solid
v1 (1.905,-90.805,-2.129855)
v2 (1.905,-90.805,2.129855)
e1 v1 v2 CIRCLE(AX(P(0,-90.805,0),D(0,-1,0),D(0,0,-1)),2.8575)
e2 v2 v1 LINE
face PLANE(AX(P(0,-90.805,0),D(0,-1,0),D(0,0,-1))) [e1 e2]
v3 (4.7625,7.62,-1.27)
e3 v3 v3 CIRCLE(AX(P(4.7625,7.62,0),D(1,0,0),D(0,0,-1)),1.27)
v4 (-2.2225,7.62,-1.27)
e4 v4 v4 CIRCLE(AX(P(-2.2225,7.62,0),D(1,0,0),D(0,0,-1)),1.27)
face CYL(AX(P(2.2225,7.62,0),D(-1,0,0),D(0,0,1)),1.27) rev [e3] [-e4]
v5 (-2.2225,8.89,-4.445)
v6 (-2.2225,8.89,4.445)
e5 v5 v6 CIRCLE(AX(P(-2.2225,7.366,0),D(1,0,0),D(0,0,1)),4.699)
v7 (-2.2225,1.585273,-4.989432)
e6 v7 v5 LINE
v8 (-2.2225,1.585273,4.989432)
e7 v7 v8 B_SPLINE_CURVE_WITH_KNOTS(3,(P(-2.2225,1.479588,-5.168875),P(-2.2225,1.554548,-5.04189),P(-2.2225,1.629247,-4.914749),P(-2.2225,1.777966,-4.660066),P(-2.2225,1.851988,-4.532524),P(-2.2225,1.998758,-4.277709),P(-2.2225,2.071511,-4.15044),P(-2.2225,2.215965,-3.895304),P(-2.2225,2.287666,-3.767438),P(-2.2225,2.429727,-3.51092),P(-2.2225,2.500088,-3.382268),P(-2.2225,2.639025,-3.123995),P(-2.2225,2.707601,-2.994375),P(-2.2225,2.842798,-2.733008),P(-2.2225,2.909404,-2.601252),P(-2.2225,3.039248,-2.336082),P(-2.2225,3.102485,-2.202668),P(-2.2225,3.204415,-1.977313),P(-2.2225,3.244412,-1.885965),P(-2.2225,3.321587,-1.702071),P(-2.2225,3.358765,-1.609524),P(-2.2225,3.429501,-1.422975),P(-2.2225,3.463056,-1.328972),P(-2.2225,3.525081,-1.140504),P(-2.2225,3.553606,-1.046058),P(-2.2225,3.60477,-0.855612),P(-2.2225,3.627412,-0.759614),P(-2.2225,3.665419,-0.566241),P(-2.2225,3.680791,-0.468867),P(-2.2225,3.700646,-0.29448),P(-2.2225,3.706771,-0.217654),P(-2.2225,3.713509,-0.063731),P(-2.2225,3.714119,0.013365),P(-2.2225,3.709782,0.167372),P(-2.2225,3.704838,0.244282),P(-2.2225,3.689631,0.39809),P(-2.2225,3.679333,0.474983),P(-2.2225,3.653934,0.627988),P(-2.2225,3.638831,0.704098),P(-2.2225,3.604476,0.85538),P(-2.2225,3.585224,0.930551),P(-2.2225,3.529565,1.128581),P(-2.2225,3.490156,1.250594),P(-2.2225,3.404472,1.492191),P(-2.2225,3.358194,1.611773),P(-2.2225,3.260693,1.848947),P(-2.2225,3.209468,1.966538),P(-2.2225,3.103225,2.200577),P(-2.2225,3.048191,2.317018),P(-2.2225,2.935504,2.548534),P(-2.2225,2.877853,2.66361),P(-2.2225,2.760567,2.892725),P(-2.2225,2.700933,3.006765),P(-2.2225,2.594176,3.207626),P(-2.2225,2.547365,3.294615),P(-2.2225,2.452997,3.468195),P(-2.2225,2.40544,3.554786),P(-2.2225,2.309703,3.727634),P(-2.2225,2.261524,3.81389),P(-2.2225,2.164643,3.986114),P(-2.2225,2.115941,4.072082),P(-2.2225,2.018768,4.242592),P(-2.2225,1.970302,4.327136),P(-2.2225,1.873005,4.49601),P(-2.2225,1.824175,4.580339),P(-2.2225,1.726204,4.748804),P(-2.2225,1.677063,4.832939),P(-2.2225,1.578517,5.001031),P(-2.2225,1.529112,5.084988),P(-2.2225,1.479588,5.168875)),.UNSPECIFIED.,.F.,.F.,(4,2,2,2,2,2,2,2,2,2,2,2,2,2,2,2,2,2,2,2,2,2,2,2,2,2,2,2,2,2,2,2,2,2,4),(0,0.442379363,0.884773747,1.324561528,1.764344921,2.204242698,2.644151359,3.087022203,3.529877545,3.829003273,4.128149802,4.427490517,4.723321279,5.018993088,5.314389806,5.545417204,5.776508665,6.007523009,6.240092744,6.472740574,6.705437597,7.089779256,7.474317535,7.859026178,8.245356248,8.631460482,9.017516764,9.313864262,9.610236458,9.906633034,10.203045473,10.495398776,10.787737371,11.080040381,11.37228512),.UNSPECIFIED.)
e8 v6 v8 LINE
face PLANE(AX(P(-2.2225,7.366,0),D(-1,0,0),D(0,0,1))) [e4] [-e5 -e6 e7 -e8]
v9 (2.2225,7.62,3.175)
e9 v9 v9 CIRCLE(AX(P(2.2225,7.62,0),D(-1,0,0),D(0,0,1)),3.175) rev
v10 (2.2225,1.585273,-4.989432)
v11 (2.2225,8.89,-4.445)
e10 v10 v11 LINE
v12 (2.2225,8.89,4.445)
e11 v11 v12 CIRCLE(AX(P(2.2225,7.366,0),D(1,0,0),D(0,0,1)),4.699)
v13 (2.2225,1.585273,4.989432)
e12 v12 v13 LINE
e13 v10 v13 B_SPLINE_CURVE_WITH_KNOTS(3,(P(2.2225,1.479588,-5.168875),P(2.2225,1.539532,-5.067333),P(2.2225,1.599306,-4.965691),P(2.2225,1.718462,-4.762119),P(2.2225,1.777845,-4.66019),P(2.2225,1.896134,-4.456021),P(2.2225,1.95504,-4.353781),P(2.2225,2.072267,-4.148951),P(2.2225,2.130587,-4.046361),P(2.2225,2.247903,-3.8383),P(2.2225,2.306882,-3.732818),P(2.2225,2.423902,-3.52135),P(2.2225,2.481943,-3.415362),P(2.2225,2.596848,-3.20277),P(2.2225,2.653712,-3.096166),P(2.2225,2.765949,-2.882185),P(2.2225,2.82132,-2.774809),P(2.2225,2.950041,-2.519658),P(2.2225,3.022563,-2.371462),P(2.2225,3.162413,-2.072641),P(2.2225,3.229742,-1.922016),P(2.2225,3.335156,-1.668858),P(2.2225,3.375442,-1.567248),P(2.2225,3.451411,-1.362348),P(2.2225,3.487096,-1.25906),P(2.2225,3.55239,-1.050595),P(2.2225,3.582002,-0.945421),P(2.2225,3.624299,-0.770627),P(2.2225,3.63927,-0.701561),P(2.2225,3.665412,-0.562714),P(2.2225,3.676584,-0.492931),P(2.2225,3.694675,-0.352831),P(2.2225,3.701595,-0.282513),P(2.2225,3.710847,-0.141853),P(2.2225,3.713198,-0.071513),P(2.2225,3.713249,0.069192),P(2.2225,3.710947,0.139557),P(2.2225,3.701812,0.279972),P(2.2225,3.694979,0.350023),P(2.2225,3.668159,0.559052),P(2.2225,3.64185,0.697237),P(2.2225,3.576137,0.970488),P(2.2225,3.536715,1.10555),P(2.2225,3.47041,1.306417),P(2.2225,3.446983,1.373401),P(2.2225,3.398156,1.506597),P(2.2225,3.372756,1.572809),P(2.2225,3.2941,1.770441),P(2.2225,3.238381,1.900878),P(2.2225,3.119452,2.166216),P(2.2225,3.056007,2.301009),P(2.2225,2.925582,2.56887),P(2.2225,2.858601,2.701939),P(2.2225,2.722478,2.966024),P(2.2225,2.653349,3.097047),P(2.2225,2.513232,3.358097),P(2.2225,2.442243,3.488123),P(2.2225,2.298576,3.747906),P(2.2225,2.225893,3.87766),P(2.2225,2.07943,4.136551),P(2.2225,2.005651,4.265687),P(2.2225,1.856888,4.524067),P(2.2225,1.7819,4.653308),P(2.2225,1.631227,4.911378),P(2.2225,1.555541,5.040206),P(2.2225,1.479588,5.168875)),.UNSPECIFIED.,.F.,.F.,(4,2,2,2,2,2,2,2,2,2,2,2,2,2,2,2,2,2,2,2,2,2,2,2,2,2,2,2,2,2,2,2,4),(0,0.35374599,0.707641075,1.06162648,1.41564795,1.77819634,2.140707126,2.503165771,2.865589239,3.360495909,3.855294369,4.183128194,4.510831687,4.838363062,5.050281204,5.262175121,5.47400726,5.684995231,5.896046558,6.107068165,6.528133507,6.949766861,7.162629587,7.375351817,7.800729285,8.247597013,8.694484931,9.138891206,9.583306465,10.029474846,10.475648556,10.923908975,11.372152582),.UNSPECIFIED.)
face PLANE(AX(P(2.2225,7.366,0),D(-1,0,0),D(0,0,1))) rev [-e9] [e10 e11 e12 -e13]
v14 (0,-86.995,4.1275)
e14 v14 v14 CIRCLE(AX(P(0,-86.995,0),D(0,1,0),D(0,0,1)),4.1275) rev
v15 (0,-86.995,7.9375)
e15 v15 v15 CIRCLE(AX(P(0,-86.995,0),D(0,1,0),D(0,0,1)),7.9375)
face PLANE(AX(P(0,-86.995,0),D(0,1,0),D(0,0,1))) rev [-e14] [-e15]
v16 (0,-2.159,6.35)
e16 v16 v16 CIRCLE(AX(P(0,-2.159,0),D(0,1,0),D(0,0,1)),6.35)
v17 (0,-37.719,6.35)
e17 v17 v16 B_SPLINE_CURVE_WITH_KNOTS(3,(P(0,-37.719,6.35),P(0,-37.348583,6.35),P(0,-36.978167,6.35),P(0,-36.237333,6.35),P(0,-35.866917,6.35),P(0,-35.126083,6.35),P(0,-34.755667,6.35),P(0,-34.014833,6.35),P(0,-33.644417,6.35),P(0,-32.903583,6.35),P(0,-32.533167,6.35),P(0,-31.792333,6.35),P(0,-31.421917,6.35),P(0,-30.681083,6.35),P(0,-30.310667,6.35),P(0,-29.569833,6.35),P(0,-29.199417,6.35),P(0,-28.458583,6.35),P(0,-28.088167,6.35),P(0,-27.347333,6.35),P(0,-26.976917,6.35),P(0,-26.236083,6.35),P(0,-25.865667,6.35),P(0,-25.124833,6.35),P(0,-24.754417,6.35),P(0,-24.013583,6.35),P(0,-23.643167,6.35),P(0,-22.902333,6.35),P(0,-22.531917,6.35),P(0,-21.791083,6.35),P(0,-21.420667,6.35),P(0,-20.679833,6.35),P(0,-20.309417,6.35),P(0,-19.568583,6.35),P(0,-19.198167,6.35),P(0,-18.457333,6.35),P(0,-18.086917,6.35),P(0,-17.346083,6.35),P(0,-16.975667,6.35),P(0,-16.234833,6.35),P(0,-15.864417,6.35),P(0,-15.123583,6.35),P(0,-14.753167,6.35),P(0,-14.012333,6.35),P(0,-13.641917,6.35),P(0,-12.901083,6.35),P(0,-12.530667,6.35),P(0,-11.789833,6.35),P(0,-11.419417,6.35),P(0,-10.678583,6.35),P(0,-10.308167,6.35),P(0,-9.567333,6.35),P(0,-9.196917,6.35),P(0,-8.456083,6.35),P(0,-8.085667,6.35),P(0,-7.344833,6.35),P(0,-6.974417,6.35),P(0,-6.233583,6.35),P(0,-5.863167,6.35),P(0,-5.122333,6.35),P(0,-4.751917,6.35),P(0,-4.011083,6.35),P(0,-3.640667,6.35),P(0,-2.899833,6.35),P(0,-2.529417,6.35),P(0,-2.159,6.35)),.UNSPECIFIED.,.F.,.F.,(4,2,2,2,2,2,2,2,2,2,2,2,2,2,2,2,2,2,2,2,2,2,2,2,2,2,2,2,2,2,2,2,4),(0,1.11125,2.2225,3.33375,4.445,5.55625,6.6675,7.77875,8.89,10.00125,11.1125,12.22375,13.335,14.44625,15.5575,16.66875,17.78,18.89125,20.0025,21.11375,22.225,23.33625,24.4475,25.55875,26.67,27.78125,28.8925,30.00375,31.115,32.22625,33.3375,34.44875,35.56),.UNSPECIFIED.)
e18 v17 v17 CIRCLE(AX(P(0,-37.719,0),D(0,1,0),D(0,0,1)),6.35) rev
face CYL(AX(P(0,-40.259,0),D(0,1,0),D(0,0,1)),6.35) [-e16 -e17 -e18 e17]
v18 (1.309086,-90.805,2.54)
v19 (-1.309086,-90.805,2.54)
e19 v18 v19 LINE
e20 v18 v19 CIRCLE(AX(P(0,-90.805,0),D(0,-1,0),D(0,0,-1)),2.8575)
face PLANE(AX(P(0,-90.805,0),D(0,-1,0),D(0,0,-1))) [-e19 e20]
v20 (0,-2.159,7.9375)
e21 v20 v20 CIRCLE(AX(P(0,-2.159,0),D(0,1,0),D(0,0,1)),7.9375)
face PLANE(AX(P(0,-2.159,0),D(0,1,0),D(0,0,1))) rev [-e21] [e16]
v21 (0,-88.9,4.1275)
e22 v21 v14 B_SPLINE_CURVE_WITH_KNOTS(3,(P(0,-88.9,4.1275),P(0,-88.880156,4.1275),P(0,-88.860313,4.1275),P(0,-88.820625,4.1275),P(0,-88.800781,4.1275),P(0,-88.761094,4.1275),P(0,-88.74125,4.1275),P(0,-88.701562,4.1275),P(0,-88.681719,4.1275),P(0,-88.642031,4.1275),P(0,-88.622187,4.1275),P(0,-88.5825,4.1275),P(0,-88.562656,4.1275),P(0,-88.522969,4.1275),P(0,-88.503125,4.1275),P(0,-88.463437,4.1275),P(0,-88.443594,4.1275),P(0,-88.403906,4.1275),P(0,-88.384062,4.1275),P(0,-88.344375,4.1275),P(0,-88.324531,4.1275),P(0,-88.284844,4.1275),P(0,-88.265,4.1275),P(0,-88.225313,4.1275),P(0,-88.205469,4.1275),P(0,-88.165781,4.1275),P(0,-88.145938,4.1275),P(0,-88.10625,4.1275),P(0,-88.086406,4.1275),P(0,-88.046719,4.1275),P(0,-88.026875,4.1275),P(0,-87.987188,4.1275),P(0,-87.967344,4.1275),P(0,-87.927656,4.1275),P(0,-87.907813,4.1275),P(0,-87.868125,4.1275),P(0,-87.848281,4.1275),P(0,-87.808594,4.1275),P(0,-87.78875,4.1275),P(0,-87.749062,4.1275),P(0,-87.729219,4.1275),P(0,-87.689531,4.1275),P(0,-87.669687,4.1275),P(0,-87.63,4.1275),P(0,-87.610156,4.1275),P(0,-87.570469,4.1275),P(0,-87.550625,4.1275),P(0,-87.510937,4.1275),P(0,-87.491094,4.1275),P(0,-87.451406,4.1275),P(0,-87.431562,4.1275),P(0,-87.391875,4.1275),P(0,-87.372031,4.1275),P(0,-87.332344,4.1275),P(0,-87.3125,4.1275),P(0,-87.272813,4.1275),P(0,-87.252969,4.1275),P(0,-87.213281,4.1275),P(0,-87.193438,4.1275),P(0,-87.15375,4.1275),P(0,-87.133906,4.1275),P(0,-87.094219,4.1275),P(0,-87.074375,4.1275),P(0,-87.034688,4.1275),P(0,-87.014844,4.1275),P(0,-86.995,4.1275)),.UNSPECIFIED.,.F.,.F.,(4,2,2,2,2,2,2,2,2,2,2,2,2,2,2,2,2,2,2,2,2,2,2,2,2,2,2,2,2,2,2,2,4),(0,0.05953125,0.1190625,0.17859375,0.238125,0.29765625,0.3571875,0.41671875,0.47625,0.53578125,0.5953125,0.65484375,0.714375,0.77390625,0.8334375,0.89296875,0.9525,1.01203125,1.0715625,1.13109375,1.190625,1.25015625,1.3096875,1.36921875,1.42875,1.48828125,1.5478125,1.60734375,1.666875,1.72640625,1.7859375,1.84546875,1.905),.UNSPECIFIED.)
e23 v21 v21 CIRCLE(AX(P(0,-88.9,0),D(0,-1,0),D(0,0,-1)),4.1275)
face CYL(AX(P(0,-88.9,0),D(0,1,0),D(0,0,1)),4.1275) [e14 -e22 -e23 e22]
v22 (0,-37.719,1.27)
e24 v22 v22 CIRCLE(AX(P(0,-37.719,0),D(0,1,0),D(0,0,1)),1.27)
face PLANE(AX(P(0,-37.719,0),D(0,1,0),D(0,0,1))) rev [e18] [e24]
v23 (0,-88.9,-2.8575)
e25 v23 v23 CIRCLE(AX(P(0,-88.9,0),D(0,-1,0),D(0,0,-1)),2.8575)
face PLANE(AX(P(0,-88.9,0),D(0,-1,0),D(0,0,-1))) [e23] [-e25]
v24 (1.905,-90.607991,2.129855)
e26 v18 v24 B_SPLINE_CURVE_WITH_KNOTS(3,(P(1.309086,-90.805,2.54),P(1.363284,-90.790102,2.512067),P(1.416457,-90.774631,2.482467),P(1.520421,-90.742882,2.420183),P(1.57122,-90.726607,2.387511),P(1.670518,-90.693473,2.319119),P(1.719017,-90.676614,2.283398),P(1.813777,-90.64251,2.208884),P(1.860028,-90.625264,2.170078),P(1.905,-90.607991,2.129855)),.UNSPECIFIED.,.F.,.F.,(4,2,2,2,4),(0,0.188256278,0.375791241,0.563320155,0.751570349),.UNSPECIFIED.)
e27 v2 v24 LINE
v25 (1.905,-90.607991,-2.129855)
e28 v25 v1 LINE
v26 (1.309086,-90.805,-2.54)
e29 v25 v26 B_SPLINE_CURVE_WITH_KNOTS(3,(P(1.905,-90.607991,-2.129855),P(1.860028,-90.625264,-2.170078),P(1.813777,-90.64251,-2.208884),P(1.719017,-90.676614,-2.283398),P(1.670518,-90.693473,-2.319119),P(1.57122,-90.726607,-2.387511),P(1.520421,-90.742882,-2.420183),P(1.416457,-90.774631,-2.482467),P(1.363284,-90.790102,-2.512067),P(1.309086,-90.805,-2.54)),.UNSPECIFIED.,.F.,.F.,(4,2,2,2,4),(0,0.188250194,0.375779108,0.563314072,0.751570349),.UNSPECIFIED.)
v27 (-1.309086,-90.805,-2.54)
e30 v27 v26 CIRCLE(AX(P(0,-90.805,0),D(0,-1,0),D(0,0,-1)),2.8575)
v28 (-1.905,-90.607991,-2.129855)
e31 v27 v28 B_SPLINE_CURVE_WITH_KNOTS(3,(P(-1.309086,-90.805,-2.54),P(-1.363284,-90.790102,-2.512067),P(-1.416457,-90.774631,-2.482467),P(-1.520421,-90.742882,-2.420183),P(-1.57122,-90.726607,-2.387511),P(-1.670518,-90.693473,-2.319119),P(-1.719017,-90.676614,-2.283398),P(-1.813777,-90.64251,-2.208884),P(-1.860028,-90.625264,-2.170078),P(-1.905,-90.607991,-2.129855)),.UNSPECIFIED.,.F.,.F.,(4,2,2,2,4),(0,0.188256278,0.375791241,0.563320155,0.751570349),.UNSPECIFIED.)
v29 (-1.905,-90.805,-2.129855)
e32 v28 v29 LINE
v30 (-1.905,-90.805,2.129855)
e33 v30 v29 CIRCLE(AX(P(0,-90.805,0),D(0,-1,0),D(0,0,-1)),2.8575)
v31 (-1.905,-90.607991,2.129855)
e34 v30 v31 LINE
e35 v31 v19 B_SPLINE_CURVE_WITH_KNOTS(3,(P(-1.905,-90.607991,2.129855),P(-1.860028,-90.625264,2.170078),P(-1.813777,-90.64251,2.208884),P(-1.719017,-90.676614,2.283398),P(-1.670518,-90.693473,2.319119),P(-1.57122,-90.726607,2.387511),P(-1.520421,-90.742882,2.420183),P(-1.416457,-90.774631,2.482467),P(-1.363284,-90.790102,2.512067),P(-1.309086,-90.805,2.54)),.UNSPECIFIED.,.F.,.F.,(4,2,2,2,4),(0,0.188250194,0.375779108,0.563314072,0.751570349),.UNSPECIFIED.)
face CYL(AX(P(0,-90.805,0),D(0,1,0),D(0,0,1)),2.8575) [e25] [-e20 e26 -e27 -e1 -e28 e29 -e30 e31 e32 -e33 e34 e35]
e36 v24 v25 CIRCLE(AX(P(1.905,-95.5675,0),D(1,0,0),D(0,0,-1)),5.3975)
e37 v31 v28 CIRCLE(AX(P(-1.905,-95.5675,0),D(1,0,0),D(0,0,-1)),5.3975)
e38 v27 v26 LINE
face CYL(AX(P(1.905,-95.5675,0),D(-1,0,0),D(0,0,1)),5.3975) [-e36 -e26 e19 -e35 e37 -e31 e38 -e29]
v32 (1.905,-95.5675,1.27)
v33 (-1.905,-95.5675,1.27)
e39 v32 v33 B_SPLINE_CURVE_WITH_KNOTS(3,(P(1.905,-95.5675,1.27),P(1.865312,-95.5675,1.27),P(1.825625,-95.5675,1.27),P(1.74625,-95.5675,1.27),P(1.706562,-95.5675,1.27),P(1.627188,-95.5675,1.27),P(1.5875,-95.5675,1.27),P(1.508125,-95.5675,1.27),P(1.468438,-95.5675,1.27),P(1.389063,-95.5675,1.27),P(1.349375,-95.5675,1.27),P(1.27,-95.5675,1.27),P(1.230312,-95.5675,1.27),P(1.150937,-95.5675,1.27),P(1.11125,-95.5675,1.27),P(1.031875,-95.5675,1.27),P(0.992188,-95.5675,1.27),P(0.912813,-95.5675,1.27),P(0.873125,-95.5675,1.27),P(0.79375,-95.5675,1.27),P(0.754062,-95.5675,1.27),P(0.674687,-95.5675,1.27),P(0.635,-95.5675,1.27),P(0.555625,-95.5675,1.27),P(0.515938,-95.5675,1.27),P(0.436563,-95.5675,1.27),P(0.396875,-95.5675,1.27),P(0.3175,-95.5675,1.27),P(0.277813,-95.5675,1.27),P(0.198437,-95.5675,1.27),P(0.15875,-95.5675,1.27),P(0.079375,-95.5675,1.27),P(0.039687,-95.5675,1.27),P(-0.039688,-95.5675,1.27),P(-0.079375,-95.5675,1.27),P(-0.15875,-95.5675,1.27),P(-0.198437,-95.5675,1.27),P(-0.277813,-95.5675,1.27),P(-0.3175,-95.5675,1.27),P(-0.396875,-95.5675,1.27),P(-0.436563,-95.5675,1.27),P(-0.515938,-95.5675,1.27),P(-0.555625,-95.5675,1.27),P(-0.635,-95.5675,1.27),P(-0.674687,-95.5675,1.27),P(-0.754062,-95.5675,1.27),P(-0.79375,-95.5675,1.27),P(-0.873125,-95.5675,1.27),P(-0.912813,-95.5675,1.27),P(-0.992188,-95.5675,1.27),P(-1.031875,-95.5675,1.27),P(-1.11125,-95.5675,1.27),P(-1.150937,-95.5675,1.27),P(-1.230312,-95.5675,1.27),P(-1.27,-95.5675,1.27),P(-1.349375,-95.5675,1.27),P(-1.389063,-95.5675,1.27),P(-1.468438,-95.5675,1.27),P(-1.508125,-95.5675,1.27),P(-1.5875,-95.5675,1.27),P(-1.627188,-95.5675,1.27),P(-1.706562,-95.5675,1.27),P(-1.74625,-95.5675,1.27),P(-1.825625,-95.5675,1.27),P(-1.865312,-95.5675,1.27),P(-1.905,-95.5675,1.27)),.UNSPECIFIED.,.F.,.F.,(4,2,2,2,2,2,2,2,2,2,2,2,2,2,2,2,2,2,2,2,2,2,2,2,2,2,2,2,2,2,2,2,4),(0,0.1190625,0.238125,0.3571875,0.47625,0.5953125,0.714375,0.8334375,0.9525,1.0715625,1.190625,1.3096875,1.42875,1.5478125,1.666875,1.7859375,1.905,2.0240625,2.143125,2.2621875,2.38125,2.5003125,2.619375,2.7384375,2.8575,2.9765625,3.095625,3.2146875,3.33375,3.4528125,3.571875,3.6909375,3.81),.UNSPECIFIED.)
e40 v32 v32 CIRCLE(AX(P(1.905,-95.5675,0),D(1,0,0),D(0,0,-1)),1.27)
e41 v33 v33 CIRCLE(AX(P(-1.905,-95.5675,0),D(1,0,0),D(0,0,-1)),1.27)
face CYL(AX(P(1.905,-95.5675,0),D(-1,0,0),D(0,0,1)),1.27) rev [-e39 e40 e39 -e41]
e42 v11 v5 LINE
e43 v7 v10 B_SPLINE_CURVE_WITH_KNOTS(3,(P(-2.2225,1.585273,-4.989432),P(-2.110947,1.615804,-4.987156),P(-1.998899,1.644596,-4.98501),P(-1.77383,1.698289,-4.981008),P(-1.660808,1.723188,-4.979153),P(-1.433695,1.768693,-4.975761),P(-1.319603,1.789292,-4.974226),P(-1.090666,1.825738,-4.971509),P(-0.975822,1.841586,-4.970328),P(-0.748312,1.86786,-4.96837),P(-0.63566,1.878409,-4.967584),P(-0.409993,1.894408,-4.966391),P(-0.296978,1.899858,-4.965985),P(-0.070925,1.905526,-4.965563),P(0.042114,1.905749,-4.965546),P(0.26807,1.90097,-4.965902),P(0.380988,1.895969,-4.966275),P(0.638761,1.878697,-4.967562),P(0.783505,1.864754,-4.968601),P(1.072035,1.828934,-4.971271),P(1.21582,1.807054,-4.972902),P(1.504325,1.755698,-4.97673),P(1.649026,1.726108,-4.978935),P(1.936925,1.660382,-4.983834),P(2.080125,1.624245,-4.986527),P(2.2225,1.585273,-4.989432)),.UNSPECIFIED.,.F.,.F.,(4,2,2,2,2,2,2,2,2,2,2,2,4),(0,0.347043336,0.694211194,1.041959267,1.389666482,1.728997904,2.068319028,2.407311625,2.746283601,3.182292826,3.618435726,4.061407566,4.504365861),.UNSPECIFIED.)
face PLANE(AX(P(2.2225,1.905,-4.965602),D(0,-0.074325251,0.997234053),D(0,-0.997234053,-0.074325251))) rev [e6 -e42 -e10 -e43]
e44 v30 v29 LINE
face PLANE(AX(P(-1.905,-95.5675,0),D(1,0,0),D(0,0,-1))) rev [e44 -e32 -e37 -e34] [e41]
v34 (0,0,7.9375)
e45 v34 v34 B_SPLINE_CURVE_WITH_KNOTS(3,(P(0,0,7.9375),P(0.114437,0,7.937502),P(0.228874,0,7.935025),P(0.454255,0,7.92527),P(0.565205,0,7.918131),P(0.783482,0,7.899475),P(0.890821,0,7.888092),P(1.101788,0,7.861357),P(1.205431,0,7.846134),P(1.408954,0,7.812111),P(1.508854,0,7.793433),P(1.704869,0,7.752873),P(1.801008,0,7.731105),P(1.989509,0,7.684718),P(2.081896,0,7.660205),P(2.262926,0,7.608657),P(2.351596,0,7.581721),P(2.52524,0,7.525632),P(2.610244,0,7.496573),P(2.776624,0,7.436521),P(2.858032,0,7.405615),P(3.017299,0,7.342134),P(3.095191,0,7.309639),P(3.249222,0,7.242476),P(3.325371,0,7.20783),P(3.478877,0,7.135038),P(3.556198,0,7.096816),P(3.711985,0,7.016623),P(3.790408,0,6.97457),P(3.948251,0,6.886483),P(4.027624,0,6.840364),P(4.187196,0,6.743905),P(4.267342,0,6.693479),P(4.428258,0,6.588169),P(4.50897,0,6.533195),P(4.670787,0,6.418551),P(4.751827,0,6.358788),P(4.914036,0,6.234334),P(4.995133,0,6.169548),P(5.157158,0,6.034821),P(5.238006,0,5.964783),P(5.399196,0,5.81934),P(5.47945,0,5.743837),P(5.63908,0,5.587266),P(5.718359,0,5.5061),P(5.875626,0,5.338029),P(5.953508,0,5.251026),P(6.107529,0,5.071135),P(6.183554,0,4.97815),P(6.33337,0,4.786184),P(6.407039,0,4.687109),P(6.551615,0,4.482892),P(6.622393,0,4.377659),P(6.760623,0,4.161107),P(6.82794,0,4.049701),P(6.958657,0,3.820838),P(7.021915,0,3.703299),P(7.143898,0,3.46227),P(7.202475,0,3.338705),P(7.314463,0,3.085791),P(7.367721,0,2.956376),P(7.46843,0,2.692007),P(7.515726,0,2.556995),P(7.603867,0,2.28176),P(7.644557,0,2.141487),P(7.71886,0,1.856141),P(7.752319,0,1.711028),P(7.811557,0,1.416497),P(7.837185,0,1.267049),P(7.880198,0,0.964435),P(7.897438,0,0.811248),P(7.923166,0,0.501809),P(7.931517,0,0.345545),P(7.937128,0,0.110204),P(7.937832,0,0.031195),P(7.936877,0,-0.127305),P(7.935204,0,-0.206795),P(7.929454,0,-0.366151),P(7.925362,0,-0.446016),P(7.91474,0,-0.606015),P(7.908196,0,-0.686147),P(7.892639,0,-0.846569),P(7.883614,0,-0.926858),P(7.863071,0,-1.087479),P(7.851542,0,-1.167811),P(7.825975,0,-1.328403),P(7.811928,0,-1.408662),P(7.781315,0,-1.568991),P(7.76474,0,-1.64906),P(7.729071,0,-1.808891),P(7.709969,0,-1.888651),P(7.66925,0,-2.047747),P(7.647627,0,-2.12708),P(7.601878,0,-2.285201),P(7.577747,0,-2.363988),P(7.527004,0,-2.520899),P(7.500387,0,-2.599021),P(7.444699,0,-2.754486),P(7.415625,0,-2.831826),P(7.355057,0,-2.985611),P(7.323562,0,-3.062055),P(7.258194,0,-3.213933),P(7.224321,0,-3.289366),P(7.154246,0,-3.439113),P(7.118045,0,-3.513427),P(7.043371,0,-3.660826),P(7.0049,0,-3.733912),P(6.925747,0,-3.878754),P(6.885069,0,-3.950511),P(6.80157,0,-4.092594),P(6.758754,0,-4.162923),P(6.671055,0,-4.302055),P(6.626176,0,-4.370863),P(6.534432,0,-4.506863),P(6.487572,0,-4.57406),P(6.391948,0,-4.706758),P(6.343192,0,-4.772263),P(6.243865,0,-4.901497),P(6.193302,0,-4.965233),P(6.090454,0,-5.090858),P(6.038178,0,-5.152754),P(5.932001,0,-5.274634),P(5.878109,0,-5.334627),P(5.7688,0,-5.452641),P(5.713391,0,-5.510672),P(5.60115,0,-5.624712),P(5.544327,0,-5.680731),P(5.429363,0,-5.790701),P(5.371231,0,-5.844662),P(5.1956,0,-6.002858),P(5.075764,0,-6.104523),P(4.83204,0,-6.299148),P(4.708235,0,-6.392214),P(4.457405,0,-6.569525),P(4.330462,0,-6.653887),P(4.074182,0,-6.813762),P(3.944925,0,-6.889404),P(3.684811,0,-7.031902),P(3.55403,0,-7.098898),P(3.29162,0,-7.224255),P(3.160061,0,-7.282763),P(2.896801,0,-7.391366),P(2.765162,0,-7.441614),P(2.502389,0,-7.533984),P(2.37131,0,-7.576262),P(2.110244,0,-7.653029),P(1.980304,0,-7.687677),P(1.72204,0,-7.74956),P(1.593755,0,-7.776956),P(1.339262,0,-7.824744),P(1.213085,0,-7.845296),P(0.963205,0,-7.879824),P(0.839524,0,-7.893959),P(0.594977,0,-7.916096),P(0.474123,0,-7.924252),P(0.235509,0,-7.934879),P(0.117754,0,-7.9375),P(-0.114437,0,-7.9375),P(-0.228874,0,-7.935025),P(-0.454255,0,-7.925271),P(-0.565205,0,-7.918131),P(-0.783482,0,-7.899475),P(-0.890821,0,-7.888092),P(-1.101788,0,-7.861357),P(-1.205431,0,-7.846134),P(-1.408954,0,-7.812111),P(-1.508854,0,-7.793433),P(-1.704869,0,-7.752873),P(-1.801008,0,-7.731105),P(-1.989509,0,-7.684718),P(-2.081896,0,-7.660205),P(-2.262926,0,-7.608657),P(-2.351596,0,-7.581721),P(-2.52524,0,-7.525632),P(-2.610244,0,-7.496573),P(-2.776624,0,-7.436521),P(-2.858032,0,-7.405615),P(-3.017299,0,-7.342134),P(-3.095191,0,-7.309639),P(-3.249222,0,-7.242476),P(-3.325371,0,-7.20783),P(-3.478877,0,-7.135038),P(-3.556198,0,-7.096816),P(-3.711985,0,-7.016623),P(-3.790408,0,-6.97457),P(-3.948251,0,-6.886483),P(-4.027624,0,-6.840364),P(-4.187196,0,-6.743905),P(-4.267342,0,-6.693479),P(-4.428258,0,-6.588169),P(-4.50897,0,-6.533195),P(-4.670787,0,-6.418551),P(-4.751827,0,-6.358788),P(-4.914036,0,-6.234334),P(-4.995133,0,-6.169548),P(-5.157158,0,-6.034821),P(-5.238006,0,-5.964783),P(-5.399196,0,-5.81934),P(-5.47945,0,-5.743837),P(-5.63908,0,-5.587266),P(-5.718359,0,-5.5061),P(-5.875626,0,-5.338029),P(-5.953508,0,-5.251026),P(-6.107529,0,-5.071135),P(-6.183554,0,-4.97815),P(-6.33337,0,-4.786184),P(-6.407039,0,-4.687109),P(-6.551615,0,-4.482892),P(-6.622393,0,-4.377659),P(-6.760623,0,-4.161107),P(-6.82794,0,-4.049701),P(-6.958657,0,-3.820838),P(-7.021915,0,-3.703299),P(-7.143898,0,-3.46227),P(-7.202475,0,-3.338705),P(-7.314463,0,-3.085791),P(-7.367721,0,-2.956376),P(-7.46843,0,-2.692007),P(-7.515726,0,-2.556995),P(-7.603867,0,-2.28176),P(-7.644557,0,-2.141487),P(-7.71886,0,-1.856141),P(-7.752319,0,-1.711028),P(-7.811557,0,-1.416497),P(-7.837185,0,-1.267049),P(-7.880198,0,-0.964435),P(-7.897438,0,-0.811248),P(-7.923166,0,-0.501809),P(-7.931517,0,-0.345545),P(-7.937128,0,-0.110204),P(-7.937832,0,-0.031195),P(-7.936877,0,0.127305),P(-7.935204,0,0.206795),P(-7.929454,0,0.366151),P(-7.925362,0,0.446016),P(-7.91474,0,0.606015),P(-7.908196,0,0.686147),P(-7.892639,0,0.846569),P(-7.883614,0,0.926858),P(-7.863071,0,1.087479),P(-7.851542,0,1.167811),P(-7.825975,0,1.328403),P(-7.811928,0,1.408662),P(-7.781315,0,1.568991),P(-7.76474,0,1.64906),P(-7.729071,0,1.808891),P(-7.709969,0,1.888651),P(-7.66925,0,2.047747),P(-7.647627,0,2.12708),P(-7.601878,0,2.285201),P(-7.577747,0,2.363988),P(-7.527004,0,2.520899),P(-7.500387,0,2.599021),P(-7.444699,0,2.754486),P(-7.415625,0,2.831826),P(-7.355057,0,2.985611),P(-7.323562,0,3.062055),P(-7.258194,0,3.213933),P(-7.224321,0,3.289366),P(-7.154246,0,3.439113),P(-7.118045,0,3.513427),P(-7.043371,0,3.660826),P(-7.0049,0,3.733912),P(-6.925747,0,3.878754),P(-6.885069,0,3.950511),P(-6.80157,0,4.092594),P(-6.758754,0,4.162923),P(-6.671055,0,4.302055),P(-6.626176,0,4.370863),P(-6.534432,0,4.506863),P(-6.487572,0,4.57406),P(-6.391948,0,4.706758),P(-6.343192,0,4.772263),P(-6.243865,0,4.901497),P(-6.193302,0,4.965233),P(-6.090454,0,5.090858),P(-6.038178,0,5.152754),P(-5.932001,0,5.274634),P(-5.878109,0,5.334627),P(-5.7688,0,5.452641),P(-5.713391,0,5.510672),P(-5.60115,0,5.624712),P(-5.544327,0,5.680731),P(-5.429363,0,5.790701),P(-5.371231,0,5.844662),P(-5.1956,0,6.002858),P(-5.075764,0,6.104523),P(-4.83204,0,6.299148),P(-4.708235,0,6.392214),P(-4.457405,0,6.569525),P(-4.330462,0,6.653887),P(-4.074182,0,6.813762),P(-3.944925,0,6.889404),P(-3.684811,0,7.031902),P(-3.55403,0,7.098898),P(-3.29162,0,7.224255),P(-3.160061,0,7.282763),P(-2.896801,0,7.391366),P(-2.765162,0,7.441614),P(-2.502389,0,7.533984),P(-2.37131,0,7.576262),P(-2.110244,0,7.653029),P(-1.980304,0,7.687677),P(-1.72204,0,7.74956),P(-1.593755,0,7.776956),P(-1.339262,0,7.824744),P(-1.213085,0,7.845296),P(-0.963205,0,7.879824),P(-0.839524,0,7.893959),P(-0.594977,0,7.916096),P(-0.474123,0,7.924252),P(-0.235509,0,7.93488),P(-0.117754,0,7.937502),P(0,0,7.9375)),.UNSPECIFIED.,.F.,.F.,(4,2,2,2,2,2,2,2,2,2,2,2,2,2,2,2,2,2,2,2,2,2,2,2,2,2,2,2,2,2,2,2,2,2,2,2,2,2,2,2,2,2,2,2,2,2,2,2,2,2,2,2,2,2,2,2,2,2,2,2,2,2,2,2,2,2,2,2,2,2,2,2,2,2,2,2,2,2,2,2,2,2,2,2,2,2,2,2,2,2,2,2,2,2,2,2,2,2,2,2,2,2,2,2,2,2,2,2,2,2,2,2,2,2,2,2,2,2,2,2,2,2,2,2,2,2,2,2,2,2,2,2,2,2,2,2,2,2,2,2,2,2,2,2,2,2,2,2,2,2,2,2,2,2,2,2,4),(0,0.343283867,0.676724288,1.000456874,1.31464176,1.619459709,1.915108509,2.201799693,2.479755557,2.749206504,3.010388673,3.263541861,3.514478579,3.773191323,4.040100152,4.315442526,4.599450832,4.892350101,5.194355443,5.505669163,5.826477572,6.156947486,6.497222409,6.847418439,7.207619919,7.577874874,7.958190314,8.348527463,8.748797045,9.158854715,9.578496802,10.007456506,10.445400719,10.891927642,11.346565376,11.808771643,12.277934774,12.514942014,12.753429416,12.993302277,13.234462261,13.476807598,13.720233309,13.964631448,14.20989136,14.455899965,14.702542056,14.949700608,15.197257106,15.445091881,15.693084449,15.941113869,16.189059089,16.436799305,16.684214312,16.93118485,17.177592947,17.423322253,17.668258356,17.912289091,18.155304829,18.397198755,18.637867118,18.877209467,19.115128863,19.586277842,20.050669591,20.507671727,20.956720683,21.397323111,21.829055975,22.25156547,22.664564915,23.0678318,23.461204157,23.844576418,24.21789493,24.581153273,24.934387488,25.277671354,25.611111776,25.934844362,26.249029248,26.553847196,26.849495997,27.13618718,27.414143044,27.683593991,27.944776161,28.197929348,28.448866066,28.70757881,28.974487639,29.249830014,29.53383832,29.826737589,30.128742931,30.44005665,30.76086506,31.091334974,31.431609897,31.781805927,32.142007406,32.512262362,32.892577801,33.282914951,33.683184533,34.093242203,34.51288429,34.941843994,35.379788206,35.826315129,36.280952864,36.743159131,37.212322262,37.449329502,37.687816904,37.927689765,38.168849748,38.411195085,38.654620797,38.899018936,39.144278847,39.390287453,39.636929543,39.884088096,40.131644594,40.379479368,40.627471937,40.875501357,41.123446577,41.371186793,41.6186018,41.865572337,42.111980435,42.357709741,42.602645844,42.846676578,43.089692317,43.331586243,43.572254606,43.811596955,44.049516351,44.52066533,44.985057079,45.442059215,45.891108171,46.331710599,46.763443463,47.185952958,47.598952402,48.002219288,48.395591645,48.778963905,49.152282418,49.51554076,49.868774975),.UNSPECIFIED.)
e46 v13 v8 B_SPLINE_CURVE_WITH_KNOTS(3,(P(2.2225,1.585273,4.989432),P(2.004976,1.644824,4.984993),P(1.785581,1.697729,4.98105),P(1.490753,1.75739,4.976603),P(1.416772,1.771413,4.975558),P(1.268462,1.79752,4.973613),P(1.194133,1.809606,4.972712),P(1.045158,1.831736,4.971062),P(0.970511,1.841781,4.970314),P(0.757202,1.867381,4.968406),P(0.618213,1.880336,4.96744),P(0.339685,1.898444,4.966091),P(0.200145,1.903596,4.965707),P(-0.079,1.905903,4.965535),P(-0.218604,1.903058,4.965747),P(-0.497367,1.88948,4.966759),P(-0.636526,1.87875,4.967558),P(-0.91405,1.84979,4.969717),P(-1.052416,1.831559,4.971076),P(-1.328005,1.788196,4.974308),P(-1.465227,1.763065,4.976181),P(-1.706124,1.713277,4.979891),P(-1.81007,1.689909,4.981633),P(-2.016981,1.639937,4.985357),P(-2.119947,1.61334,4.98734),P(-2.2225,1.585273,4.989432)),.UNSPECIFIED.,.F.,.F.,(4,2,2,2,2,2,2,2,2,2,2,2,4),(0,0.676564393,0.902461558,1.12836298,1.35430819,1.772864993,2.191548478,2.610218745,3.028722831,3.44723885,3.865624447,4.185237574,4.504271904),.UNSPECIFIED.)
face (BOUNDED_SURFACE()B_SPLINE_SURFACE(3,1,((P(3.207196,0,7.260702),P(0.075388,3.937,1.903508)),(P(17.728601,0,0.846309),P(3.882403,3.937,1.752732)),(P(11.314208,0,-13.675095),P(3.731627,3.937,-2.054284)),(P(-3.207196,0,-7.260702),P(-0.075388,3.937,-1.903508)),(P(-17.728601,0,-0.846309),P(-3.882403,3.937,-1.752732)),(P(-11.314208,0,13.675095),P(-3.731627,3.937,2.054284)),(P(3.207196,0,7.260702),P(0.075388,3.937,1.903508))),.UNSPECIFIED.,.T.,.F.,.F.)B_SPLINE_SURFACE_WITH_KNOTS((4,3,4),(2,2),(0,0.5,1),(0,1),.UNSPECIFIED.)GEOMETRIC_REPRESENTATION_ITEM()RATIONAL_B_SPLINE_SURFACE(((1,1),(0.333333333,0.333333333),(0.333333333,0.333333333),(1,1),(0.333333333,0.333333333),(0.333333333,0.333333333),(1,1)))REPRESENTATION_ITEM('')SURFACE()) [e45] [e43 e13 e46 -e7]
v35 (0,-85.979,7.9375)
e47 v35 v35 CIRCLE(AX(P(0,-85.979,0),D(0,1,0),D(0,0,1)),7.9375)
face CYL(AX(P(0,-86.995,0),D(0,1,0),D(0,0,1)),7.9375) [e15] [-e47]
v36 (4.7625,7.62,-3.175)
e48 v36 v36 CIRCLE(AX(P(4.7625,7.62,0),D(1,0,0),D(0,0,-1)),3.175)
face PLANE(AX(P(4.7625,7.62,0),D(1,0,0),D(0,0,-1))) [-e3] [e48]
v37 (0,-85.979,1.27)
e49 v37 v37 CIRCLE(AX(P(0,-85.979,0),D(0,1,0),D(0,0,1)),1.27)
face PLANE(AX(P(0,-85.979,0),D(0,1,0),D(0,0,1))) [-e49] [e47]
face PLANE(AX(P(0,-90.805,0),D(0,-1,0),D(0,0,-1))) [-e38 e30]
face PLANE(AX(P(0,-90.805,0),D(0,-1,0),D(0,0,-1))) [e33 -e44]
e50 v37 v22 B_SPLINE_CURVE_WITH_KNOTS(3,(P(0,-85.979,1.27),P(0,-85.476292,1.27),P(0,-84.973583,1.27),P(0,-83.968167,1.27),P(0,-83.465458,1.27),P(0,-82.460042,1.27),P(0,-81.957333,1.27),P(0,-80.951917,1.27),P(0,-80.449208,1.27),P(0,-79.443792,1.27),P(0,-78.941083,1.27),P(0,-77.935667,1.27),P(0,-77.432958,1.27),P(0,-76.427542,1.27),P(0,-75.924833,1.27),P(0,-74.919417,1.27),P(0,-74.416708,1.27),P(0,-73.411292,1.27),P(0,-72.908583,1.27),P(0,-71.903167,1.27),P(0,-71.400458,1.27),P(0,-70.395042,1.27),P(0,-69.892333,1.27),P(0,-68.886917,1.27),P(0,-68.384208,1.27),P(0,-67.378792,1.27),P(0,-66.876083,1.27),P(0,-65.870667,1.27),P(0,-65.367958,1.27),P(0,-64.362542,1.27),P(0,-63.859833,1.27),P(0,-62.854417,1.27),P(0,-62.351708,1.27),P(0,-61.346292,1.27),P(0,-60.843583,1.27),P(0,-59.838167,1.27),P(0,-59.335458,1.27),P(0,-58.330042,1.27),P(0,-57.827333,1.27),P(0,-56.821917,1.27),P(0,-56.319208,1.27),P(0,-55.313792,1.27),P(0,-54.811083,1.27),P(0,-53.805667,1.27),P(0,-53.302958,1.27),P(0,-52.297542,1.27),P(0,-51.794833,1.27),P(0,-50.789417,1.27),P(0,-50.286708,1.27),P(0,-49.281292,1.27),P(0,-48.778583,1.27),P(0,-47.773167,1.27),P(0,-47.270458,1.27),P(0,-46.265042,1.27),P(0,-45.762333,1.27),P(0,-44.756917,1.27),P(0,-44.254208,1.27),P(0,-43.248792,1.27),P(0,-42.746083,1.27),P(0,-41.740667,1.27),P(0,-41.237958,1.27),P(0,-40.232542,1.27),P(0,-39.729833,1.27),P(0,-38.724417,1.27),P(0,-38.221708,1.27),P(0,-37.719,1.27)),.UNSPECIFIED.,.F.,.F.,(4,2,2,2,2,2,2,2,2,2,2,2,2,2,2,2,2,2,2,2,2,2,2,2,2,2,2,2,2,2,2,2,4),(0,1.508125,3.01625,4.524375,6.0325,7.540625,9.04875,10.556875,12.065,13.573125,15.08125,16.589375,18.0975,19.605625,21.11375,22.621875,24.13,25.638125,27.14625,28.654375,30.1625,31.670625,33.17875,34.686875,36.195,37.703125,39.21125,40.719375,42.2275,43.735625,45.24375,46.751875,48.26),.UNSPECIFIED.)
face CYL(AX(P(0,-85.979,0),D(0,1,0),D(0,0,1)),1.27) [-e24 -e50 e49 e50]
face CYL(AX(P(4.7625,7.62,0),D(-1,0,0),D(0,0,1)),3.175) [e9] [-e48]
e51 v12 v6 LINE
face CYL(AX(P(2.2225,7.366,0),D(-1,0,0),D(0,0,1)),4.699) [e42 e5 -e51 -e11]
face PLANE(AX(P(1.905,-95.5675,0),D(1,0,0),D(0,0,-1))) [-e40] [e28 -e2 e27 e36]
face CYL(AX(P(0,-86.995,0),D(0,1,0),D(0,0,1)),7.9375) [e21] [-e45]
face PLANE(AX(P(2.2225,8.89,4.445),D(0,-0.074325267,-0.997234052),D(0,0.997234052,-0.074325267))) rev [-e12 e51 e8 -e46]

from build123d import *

# Parameters (mm, degrees)
SKETCH1_R          = 7.9375
EXTRUDE1_DEPTH     = 86.995
SKETCH4_R          = 1.27
EXTRUDE2_DEPTH     = 2.2225
SKETCH5_R          = 5.3975
SKETCH5_R_2        = 1.27
EXTRUDE3_DEPTH     = 1.905
SKETCH6_R          = 4.1275
EXTRUDE4_DEPTH     = 1.905
SKETCH7_R          = 2.8575
EXTRUDE5_DEPTH     = 1.905
SKETCH8_R          = 3.175
SKETCH8_R_2        = 1.27
EXTRUDE6_DEPTH     = 2.54
SKETCH10_R         = 7.9375
SKETCH10_R_2       = 6.35
CUT_EXTRUDE2_DEPTH = 38.1
SKETCH11_R         = 7.9375
SKETCH11_R_2       = 1.27
CUT_EXTRUDE3_DEPTH = 48.26


with BuildPart() as part:
    # Sketch1 → Extrude1 (new body)
    with BuildSketch(Plane(origin=(0, 0, 0), x_dir=(1, 0, 0), z_dir=(0, 1, 0))):
        with Locations(Location((0, 0, 0), (0, 0, 270))):
            Circle(SKETCH1_R)
    extrude(amount=-EXTRUDE1_DEPTH)

    # Loft1: read off the stored shape, not the designer's step
    # Loft1: loft between two sections, ruled curve by curve
    loft1_from = [
        Edge.make_bspline([(3.207196431, 0, 7.26070226), (17.72860095, 0, 0.846309398), (11.314208088, 0, -13.675095122), (-3.207196431, 0, -7.26070226), (-17.72860095, 0, -0.846309398), (-11.314208088, 0, 13.675095122), (3.207196431, 0, 7.26070226)], [0, 0, 0, 0, 0.5, 0.5, 0.5, 1, 1, 1, 1], 3, [1, 0.333333333, 0.333333333, 1, 0.333333333, 0.333333333, 1]),
    ]
    loft1_to = [
        Edge.make_bspline([(0.075387957, 3.937, 1.903507724), (3.882403406, 3.937, 1.75273181), (3.731627491, 3.937, -2.054283639), (-0.075387957, 3.937, -1.903507724), (-3.882403406, 3.937, -1.75273181), (-3.731627491, 3.937, 2.054283639), (0.075387957, 3.937, 1.903507724)], [0, 0, 0, 0, 0.5, 0.5, 0.5, 1, 1, 1, 1], 3, [1, 0.333333333, 0.333333333, 1, 0.333333333, 0.333333333, 1]),
    ]
    loft1 = Solid(Shell([*[Face.make_surface_from_curves(loft1_from[k], loft1_to[k]) for k in range(1)], Face(Wire(loft1_from)), Face(Wire(loft1_to))]))
    add(loft1)

    # Sketch4 → Extrude2 (add, symmetric)
    with BuildSketch(Plane(origin=(0, 0, 0), x_dir=(0, 0, -1), z_dir=(1, 0, 0))):
        with BuildLine():
            Line((4.965601833, 1.905), (4.445, 8.89))
            ThreePointArc((4.445, 8.89), (0, 12.065), (-4.445, 8.89))
            Line((-4.445, 8.89), (-4.965601949, 1.905))
            Line((-4.965601949, 1.905), (-5.107584298, 0))
            Line((-5.107584298, 0), (5.107584151, 0))
            Line((5.107584151, 0), (4.965601833, 1.905))
        make_face()
        with Locations((0, 7.62)):
            Circle(SKETCH4_R, mode=Mode.SUBTRACT)
    extrude(amount=EXTRUDE2_DEPTH, both=True)

    # Sketch6 → Extrude4 (add)
    with BuildSketch(Plane.XZ.offset(86.995)):
        with Locations(Location((0, 0, 0), (0, 0, 90))):
            Circle(SKETCH6_R)
    extrude(amount=EXTRUDE4_DEPTH)



with BuildPart() as body_2:
    # Sketch5 → Extrude3 (new, symmetric)
    with BuildSketch(Plane(origin=(0, 0, 0), x_dir=(0, 0, -1), z_dir=(1, 0, 0))):
        with Locations(Location((0, -95.5675, 0), (0, 0, 180))):
            Circle(SKETCH5_R)
        with Locations(Location((0, -95.5675, 0), (0, 0, 180))):
            Circle(SKETCH5_R_2, mode=Mode.SUBTRACT)
    extrude(amount=EXTRUDE3_DEPTH, both=True)


with BuildPart() as part_1:
    add(part.part)

    add(body_2.part)  # Extrude5 merges body 2
    # Sketch7 → Extrude5 (add)
    with BuildSketch(Plane.XZ.offset(88.9)):
        with Locations(Location((0, 0, 0), (0, 0, 117.266044451))):
            Circle(SKETCH7_R)
    extrude(amount=EXTRUDE5_DEPTH)

    # Sketch8 → Extrude6 (add)
    with BuildSketch(Plane(origin=(2.2225, 0, 0), x_dir=(0, 0, -1), z_dir=(1, 0, 0))):
        with Locations(Location((0, 7.62, 0), (0, 0, 180))):
            Circle(SKETCH8_R)
        with Locations((0, 7.62)):
            Circle(SKETCH8_R_2, mode=Mode.SUBTRACT)
    extrude(amount=EXTRUDE6_DEPTH)

    # Sketch10 → Cut-Extrude2 (cut)
    with BuildSketch(Plane(origin=(0, -2.159, 0), x_dir=(-1, 0, 0), z_dir=(0, 1, 0))):
        with Locations(Location((0, 0, 0), (0, 0, 90))):
            Circle(SKETCH10_R)
        with Locations(Location((0, 0, 0), (0, 0, 90))):
            Circle(SKETCH10_R_2, mode=Mode.SUBTRACT)
    extrude(amount=-CUT_EXTRUDE2_DEPTH, mode=Mode.SUBTRACT)

    # Sketch11 → Cut-Extrude3 (cut)
    with BuildSketch(Plane(origin=(0, -37.719, 0), x_dir=(-1, 0, 0), z_dir=(0, 1, 0))):
        with Locations(Location((0, 0, 0), (0, 0, 90))):
            Circle(SKETCH11_R)
        with Locations(Location((0, 0, 0), (0, 0, 90))):
            Circle(SKETCH11_R_2, mode=Mode.SUBTRACT)
    extrude(amount=-CUT_EXTRUDE3_DEPTH, mode=Mode.SUBTRACT)


solid = part_1.part
